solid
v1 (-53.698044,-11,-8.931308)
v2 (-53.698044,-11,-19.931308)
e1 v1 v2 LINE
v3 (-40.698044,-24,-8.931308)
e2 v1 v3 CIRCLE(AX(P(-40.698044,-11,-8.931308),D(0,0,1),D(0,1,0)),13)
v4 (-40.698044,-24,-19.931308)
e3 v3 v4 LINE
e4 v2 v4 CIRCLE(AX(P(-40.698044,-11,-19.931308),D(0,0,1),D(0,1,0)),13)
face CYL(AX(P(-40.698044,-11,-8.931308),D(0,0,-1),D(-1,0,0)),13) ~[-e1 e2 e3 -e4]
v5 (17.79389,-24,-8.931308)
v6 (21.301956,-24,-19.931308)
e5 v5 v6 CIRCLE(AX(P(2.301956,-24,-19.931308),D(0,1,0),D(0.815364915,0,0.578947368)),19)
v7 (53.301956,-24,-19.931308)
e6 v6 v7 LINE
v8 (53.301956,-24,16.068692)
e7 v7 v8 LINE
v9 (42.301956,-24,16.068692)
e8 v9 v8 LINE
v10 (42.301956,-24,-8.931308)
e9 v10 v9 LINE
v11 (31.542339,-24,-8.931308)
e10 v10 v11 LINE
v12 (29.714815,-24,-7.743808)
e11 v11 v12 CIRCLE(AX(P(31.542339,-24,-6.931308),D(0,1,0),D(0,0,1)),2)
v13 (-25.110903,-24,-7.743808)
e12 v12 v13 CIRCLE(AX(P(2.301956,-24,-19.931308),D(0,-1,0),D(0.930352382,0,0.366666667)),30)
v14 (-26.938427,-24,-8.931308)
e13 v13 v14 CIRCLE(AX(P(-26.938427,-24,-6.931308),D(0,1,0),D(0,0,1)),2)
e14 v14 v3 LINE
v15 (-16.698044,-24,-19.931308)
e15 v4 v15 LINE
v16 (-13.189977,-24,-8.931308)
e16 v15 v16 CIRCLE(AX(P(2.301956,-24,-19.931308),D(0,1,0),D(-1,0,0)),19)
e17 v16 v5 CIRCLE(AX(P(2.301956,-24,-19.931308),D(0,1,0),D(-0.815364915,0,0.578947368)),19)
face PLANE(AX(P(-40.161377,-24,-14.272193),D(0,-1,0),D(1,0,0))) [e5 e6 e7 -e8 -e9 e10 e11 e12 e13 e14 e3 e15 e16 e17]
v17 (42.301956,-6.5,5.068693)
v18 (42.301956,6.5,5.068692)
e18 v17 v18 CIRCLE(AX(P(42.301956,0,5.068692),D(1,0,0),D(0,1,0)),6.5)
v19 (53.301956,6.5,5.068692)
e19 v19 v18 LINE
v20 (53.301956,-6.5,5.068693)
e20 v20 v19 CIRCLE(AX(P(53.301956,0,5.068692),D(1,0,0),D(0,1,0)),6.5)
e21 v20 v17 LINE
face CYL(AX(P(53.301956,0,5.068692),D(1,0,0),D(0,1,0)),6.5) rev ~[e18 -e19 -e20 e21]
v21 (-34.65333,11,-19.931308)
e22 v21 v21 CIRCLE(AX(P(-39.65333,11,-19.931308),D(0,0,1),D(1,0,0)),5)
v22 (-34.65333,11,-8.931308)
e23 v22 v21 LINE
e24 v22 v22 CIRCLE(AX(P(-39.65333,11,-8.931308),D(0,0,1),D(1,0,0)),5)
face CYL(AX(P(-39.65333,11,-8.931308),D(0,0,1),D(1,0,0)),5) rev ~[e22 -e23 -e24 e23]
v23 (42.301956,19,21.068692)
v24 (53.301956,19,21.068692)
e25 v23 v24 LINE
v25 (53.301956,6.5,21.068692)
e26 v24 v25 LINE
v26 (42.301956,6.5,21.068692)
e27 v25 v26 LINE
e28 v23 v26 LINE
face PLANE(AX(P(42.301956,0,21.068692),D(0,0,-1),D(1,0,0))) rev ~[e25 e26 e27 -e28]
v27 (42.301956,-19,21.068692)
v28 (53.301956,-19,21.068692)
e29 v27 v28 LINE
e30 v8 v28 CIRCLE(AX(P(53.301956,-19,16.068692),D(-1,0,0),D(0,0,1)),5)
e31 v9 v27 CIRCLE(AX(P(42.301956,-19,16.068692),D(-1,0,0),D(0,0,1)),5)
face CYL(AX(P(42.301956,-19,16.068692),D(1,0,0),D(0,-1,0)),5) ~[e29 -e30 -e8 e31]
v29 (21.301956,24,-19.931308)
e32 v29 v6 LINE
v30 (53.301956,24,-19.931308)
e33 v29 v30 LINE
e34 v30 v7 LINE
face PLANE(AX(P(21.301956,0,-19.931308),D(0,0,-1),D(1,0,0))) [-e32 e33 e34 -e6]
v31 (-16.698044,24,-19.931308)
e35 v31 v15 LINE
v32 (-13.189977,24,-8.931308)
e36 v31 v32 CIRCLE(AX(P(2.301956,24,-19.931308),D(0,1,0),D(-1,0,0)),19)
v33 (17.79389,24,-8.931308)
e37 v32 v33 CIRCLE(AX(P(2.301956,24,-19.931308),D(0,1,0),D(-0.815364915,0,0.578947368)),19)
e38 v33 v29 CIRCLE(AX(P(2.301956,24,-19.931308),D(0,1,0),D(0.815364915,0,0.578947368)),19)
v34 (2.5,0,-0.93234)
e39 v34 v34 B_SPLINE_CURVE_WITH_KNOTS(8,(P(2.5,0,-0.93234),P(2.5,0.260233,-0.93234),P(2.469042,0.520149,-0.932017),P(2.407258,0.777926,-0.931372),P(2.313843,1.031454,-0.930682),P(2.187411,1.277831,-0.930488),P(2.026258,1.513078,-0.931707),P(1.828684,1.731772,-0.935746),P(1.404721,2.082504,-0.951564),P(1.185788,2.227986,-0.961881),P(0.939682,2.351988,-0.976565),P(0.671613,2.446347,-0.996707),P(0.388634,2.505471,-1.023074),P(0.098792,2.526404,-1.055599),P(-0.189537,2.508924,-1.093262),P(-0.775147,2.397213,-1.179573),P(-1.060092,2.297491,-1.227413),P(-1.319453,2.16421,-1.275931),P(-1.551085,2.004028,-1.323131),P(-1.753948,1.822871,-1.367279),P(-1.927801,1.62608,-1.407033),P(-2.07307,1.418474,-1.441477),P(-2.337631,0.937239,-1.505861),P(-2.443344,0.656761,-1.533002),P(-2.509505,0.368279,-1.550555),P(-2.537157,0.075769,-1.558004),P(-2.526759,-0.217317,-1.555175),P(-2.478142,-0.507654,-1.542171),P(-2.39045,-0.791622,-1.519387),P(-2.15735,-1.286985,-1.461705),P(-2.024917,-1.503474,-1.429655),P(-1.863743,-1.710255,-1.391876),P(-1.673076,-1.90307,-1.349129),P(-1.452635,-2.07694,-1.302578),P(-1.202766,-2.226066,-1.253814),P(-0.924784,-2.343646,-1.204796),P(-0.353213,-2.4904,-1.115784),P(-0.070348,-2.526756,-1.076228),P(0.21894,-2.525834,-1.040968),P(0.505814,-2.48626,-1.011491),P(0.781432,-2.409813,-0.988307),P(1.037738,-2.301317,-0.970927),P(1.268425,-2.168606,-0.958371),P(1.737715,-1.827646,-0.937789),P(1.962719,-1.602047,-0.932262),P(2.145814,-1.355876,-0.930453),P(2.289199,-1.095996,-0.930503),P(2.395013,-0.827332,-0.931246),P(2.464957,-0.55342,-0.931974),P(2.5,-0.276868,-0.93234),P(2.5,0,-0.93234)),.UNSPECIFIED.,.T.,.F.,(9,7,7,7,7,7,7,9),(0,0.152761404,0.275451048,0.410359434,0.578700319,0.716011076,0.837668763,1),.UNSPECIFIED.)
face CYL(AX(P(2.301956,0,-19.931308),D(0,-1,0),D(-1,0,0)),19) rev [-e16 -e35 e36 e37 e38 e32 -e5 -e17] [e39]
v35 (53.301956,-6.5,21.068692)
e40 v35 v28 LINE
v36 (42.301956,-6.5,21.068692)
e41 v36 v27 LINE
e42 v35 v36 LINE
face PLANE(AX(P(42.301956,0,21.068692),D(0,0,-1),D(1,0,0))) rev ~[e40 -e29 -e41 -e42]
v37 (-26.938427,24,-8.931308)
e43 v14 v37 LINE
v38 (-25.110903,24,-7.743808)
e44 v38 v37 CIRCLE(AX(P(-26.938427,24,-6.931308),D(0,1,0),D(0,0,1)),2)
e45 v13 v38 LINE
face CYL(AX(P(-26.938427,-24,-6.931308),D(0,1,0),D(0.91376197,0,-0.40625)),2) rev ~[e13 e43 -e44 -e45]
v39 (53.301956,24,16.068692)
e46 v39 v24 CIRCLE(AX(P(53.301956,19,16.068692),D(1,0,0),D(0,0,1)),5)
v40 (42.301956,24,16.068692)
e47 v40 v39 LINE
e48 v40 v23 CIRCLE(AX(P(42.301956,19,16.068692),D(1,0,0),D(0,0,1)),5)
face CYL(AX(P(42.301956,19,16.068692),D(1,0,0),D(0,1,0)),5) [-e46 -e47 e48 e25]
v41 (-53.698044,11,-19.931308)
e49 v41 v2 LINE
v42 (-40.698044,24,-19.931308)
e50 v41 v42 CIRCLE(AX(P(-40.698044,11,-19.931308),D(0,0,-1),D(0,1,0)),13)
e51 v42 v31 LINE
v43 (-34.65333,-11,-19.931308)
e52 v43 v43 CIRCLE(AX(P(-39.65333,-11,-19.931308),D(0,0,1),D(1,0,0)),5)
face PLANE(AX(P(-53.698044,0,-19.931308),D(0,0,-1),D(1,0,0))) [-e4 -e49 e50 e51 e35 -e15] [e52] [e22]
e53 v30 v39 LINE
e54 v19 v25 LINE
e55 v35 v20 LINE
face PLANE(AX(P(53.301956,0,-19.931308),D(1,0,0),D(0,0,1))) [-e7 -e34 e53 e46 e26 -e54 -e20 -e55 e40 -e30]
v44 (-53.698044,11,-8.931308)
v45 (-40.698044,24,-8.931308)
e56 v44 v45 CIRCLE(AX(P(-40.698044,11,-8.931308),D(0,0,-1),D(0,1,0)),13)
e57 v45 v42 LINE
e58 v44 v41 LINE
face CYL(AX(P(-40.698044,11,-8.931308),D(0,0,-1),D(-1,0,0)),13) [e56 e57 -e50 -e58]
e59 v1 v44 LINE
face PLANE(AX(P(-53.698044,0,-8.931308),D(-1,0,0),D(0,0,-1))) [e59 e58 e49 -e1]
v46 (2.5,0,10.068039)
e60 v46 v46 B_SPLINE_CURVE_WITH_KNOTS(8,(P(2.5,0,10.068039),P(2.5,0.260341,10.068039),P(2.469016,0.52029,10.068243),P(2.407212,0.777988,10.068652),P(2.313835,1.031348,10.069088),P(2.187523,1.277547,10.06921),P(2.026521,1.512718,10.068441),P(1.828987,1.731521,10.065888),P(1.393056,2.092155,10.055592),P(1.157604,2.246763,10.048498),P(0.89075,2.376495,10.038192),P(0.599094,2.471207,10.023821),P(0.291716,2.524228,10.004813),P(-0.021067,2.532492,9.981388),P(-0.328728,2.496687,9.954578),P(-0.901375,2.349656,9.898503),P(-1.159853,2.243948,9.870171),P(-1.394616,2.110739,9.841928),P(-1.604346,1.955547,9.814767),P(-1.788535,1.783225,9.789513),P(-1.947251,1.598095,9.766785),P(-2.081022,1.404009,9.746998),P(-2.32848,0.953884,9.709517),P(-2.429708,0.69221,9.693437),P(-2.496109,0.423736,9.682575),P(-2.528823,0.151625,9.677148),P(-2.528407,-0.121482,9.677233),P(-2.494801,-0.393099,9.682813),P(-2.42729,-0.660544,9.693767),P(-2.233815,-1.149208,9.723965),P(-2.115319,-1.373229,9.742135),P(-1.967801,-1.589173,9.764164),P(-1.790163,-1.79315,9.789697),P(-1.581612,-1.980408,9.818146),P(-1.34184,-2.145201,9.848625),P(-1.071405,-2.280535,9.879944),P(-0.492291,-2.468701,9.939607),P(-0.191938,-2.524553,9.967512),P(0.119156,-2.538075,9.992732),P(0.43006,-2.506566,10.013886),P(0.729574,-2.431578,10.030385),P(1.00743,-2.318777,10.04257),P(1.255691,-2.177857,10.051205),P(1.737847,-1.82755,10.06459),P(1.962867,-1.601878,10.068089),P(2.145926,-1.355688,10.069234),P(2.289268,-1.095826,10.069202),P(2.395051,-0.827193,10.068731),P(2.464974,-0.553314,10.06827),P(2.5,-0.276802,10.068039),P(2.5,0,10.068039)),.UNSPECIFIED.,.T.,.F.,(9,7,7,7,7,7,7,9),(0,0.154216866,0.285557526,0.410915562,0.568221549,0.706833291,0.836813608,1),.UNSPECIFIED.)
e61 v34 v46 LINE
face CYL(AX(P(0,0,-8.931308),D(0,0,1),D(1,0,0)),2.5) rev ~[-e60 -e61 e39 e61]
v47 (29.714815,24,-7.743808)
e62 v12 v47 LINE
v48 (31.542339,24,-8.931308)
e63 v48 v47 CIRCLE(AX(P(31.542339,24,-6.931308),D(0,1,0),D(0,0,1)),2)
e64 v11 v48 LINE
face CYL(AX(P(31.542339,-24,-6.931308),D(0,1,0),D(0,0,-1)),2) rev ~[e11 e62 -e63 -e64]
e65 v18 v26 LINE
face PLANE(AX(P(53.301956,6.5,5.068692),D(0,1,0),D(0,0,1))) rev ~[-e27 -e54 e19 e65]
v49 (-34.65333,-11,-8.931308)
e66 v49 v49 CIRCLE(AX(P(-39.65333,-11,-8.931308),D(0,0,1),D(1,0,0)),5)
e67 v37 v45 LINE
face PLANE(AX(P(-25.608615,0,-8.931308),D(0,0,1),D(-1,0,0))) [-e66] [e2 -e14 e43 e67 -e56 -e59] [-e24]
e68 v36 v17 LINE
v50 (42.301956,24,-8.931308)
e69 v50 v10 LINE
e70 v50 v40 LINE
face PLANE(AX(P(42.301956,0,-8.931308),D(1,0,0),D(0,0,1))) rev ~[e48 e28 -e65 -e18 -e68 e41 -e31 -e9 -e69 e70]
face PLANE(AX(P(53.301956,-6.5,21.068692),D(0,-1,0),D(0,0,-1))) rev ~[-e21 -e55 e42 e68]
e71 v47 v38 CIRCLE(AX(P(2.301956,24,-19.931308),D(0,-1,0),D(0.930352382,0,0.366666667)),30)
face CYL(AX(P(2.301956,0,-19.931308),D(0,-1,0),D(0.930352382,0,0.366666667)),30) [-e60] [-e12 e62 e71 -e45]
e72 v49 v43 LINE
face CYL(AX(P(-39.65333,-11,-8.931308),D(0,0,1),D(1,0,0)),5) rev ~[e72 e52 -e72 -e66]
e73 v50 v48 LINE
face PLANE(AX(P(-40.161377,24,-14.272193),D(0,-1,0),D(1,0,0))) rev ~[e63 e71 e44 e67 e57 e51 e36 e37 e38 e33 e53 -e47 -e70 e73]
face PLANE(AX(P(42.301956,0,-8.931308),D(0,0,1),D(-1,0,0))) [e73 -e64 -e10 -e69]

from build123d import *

# Parameters (mm, degrees)
F0_W     = 11
F0_H     = 30
F1_DEPTH = 24
F3_DEPTH = 25
F4_R     = 5
F4_R_2   = 2.5
F5_DEPTH = 25
F6_R     = 13
F7_R     = 5
F8_R     = 2


with BuildPart() as f1:
    # F0 (on Front) → F1 (new body, symmetric)
    with BuildSketch(Plane.XZ):
        with BuildLine():
            ThreePointArc((-27.6980438828, -19.9313075026), (-27.1710581859, -14.3329659721), (-25.6086153568, -8.9313075026))
            Line((-25.6086153568, -8.9313075026), (-53.6980438828, -8.9313075026))
            Line((-53.6980438828, -8.9313075026), (-53.6980438828, -19.9313075026))
            Line((-53.6980438828, -19.9313075026), (-27.6980438828, -19.9313075026))
        make_face()
        with BuildLine():
            Line((-13.1899772677, -8.9313075026), (-25.6086153568, -8.9313075026))
            ThreePointArc((-25.6086153568, -8.9313075026), (-27.1710581859, -14.3329659721), (-27.6980438828, -19.9313075026))
            Line((-27.6980438828, -19.9313075026), (-16.6980438828, -19.9313075026))
            ThreePointArc((-16.6980438828, -19.9313075026), (-15.7997942721, -14.1583851192), (-13.1899772677, -8.9313075026))
        make_face()
        with BuildLine():
            Line((17.793889502, -8.9313075026), (30.2125275911, -8.9313075026))
            ThreePointArc((30.2125275911, -8.9313075026), (2.3019561172, 10.0686924974), (-25.6086153568, -8.9313075026))
            Line((-25.6086153568, -8.9313075026), (-13.1899772677, -8.9313075026))
            ThreePointArc((-13.1899772677, -8.9313075026), (2.3019561172, -0.9313075026), (17.793889502, -8.9313075026))
        make_face()
        with BuildLine():
            ThreePointArc((32.3019561172, -19.9313075026), (31.7749704202, -14.3329659721), (30.2125275911, -8.9313075026))
            Line((30.2125275911, -8.9313075026), (17.793889502, -8.9313075026))
            ThreePointArc((17.793889502, -8.9313075026), (20.4037065064, -14.1583851192), (21.3019561172, -19.9313075026))
            Line((21.3019561172, -19.9313075026), (32.3019561172, -19.9313075026))
        make_face()
        with BuildLine():
            Line((53.3019561172, -8.9313075026), (42.3019561172, -8.9313075026))
            Line((42.3019561172, -8.9313075026), (30.2125275911, -8.9313075026))
            ThreePointArc((30.2125275911, -8.9313075026), (31.7749704202, -14.3329659721), (32.3019561172, -19.9313075026))
            Line((32.3019561172, -19.9313075026), (53.3019561172, -19.9313075026))
            Line((53.3019561172, -19.9313075026), (53.3019561172, -8.9313075026))
        make_face()
        with Locations((47.8019561172, 6.0686924974)):
            Rectangle(F0_W, F0_H)
    extrude(amount=F1_DEPTH, both=True)

    # F2 (on face) → F3 (cut)
    with BuildSketch(Plane.YZ.offset(53.3019561172)):
        with BuildLine():
            ThreePointArc((-6.5, 5.0686926821), (-9.23e-08, -1.4313075026), (6.5, 5.0686924974))
            ThreePointArc((6.5, 5.0686924974), (9.23e-08, 11.5686924974), (-6.5, 5.0686926821))
        make_face()
        with BuildLine():
            ThreePointArc((-6.5, 5.0686926821), (9.23e-08, 11.5686924974), (6.5, 5.0686924974))
            Line((6.5, 5.0686924974), (6.5, 21.0686924974))
            Line((6.5, 21.0686924974), (-6.5, 21.0686924974))
            Line((-6.5, 21.0686924974), (-6.5, 5.0686926821))
        make_face()
    extrude(amount=-F3_DEPTH, mode=Mode.SUBTRACT)

    # F4 (on face) → F5 (cut, symmetric)
    with BuildSketch(Plane.XY.offset(-8.9313075026)):
        with Locations((-39.6533296198, -11)):
            Circle(F4_R)
        with Locations((-39.6533296198, 11)):
            Circle(F4_R)
        Circle(F4_R_2)
    extrude(amount=F5_DEPTH, both=True, mode=Mode.SUBTRACT)

    # F6
    f6_edges = [f1.edges().sort_by_distance(p)[0] for p in [
        (-53.698044, 24, -14.431308),
        (-53.698044, -24, -14.431308),
    ]]
    fillet(f6_edges, radius=F6_R)

    # F7
    f7_edges = [f1.edges().sort_by_distance(p)[0] for p in [
        (47.801956, 24, 21.068692),
        (47.801956, -24, 21.068692),
    ]]
    fillet(f7_edges, radius=F7_R)

    # F8
    f8_edges = [f1.edges().sort_by_distance(p)[0] for p in [
        (30.212528, 0, -8.931308),
        (-25.608615, 0, -8.931308),
    ]]
    fillet(f8_edges, radius=F8_R)


solid = f1.part
